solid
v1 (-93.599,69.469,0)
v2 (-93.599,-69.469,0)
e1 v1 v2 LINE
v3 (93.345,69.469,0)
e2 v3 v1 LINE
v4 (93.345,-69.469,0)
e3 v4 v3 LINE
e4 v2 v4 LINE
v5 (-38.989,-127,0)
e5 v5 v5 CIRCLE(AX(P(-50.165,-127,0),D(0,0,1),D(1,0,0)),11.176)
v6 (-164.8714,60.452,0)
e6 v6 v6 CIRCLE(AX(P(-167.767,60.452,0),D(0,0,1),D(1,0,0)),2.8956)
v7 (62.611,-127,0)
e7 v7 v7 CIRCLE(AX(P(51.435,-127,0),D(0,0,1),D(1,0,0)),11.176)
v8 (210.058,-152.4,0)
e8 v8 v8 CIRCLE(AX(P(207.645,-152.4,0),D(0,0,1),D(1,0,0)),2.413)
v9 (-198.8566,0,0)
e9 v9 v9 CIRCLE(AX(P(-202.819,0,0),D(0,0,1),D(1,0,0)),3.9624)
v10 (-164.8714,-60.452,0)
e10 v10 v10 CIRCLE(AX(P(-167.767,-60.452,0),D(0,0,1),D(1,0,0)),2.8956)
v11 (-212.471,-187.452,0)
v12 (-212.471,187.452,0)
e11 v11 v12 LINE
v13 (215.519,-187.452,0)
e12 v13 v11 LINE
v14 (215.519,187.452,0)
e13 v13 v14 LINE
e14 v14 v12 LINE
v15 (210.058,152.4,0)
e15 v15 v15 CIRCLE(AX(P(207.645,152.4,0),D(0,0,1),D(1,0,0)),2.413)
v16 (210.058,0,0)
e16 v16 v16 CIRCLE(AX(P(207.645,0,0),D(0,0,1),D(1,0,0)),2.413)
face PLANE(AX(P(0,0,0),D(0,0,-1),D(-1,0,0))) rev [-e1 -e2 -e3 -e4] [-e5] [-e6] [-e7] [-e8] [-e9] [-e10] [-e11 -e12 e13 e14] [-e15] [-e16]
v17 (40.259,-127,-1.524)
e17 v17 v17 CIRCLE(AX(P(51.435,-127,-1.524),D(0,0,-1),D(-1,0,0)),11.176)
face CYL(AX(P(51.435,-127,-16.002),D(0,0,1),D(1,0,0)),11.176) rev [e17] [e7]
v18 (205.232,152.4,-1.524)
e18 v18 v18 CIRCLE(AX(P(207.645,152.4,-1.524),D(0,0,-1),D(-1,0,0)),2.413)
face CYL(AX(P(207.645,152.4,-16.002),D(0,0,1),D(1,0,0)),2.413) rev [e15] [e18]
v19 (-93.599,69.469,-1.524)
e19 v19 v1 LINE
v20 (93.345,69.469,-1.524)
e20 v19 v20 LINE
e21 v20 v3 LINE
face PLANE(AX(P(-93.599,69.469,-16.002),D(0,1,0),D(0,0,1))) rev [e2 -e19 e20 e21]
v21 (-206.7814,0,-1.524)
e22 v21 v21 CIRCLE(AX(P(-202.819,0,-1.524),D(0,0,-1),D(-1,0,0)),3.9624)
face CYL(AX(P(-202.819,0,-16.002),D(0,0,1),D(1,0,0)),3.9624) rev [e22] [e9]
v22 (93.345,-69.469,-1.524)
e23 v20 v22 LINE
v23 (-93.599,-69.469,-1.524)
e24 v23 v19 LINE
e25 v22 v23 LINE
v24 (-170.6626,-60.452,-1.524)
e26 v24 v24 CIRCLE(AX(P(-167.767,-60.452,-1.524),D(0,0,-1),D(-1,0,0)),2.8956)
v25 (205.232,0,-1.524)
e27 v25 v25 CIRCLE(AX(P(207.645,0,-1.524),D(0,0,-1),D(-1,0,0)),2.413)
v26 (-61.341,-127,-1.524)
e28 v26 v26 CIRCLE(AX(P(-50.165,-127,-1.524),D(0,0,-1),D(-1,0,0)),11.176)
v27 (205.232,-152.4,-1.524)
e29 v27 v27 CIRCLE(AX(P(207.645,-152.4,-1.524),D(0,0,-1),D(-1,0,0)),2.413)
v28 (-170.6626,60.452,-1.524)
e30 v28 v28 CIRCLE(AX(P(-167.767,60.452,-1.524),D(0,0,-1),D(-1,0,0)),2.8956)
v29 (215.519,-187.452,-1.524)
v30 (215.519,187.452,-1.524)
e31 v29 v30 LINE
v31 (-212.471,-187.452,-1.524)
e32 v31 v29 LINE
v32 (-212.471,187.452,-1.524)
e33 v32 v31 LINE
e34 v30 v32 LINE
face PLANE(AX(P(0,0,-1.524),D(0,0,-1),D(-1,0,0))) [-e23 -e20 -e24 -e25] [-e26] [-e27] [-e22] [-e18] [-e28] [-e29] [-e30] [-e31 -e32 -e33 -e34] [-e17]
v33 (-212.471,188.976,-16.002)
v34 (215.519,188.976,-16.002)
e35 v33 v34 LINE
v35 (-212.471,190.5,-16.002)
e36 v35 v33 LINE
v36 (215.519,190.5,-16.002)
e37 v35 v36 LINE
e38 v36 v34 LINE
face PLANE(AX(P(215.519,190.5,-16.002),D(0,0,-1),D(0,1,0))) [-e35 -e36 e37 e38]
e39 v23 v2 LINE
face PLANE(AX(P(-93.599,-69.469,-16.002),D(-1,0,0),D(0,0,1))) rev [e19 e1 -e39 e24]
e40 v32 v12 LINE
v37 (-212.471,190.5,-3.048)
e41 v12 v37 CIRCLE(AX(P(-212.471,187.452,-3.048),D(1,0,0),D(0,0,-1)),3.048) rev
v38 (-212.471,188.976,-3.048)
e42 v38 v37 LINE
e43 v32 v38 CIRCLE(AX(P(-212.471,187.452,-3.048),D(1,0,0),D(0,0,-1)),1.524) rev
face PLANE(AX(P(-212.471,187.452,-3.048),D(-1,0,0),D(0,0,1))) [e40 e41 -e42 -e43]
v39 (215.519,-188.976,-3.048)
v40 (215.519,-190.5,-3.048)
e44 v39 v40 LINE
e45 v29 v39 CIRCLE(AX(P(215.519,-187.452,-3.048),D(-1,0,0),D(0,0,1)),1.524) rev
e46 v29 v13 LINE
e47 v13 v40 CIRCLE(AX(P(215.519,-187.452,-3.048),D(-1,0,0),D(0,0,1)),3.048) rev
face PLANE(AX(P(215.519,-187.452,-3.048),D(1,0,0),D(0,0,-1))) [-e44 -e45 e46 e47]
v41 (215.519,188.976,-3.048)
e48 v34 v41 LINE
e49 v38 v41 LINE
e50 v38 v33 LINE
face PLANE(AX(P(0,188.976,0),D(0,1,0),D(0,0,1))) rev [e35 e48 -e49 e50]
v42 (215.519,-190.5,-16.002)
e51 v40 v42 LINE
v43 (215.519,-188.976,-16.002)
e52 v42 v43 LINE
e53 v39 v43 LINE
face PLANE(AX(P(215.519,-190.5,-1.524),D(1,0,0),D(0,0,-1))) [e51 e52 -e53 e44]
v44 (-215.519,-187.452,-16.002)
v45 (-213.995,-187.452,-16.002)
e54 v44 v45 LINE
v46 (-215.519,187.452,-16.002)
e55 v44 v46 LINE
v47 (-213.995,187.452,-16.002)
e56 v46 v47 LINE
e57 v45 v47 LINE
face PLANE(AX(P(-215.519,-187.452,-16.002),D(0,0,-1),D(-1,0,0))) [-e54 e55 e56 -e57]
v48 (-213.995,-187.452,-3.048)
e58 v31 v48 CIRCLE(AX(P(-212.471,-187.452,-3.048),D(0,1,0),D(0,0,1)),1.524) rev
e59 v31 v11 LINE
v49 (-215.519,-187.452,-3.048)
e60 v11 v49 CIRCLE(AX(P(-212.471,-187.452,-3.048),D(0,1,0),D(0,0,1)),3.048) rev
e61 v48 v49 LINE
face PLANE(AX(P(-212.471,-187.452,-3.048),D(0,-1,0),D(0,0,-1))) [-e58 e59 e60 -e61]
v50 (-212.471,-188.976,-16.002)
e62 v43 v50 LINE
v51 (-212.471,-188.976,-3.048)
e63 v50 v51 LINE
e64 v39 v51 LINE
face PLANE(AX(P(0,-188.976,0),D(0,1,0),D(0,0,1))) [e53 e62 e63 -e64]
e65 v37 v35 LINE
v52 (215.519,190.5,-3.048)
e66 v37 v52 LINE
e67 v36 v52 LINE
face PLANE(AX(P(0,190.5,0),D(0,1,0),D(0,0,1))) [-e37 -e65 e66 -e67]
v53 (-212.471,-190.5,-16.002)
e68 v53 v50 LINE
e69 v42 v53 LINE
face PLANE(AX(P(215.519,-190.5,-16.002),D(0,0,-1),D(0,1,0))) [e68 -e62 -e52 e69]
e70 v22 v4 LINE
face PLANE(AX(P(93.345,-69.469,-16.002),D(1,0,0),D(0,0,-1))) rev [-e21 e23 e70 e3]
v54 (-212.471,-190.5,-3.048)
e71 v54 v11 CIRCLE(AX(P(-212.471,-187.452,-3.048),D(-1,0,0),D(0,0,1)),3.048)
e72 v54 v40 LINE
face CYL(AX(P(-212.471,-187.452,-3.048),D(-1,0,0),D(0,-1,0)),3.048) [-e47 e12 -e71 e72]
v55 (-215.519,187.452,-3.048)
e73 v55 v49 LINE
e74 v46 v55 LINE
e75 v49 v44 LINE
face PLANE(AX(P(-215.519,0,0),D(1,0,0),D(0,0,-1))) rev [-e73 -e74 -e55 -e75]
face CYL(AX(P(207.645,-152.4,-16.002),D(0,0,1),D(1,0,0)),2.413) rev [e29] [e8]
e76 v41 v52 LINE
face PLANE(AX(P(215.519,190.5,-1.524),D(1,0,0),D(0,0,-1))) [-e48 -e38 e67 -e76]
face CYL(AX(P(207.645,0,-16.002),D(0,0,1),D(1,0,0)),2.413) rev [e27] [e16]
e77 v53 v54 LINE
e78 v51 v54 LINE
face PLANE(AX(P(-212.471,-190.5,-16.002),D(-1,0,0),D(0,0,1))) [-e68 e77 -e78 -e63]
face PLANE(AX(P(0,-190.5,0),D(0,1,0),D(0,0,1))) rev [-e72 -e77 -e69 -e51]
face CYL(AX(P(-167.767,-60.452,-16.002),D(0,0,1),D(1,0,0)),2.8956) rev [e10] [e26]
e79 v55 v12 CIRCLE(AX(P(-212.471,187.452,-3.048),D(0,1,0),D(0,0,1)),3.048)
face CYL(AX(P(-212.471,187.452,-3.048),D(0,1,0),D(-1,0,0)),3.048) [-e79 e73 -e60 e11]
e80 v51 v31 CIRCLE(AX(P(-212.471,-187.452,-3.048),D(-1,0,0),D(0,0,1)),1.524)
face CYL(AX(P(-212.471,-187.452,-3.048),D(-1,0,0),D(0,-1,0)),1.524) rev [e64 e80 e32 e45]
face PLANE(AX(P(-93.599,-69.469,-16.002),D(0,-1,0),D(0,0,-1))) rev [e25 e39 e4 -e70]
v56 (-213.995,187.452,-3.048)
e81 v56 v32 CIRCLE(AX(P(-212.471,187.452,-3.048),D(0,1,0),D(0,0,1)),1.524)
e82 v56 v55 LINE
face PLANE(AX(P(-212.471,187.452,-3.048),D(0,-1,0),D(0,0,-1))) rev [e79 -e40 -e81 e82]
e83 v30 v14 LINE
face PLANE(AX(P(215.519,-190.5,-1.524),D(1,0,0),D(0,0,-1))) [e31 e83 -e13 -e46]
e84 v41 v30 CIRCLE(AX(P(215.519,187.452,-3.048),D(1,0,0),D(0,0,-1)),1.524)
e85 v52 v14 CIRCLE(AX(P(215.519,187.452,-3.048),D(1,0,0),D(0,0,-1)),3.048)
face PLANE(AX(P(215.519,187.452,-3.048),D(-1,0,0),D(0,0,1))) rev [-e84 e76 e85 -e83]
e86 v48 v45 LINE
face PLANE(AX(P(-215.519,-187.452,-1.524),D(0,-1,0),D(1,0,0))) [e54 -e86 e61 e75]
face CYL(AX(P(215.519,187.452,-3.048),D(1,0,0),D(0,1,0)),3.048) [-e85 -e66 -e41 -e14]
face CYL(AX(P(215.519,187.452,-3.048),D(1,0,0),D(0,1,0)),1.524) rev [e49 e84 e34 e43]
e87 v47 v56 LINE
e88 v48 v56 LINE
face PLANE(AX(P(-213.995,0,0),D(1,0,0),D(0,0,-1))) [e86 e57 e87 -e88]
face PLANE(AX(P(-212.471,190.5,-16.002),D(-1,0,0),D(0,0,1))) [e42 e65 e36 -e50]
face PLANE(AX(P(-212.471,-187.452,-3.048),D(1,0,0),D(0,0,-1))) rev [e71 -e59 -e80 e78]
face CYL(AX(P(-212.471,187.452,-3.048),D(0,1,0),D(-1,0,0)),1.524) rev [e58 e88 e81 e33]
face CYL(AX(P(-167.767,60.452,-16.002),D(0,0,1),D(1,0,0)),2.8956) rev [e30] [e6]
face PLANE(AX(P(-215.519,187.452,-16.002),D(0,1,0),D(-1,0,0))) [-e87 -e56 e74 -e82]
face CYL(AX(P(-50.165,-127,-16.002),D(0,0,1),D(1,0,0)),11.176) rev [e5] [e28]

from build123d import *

# Parameters (mm, degrees)
CROQUIS1_W                         = 431.038
CROQUIS1_H                         = 381
BRIDA_BASE1_DEPTH                  = 1.524
CROQUIS6_W                         = 3.048
CROQUIS6_H                         = 3.048
CORTAR_EXTRUIR1_DEPTH              = 288.647374292
BRIDA_DE_ARISTA1_STRIP_W           = 9.144
BRIDA_DE_ARISTA1_STRIP_H           = 1.524
BRIDA_DE_ARISTA1_STRIP_CUT_DEPTH   = 427.99
BRIDA_DE_ARISTA1_STRIP_2_W         = 9.144
BRIDA_DE_ARISTA1_STRIP_2_H         = 1.524
BRIDA_DE_ARISTA1_STRIP_CUT_2_DEPTH = 374.904
BRIDA_DE_ARISTA1_STRIP_3_W         = 9.144
BRIDA_DE_ARISTA1_STRIP_3_H         = 1.524
BRIDA_DE_ARISTA1_STRIP_CUT_3_DEPTH = 427.99
BRIDA_DE_ARISTA1_DEPTH             = 427.99
BRIDA_DE_ARISTA1_BEND_DEPTH        = 374.904
BRIDA_DE_ARISTA1_BEND_2_DEPTH      = 427.99
CROQUIS16_R                        = 3.9624
CROQUIS16_R_2                      = 2.8956
CROQUIS16_R_3                      = 11.176
CROQUIS16_R_4                      = 2.413
CROQUIS16_W                        = 186.944
CROQUIS16_H                        = 138.938
CORTAR_EXTRUIR2_DEPTH              = 289.088100006


# Sheet-metal steps are written as plain solids
with BuildPart() as part:
    # Croquis1 → Brida base1 (new body)
    with BuildSketch(Plane.XY):
        Rectangle(CROQUIS1_W, CROQUIS1_H)
    extrude(amount=-BRIDA_BASE1_DEPTH)

    # Croquis6 → Cortar-Extruir1 (cut, through all)
    with BuildSketch(Plane.XY):
        with Locations((-213.995, 188.976)):
            Rectangle(CROQUIS6_W, CROQUIS6_H)
        with Locations((-213.995, -188.976)):
            Rectangle(CROQUIS6_W, CROQUIS6_H)
    extrude(amount=-CORTAR_EXTRUIR1_DEPTH, mode=Mode.SUBTRACT)

    # Brida de arista1 strip (across the edge) → Brida de arista1 strip cut (cut)
    with BuildSketch(Plane(origin=(-212.471, 190.5, -1.524), x_dir=(0, -1, 0), z_dir=(1, 0, 0))):
        with Locations((-1.524, -0.762)):
            Rectangle(BRIDA_DE_ARISTA1_STRIP_W, BRIDA_DE_ARISTA1_STRIP_H)
    extrude(amount=BRIDA_DE_ARISTA1_STRIP_CUT_DEPTH, mode=Mode.SUBTRACT)

    # Brida de arista1 strip 2 (across the edge) → Brida de arista1 strip cut 2 (cut)
    with BuildSketch(Plane(origin=(-215.519, -187.452, -1.524), x_dir=(1, 0, 0), z_dir=(0, 1, 0))):
        with Locations((-1.524, -0.762)):
            Rectangle(BRIDA_DE_ARISTA1_STRIP_2_W, BRIDA_DE_ARISTA1_STRIP_2_H)
    extrude(amount=BRIDA_DE_ARISTA1_STRIP_CUT_2_DEPTH, mode=Mode.SUBTRACT)

    # Brida de arista1 strip 3 (across the edge) → Brida de arista1 strip cut 3 (cut)
    with BuildSketch(Plane(origin=(215.519, -190.5, -1.524), x_dir=(0, 1, 0), z_dir=(-1, 0, 0))):
        with Locations((-1.524, -0.762)):
            Rectangle(BRIDA_DE_ARISTA1_STRIP_3_W, BRIDA_DE_ARISTA1_STRIP_3_H)
    extrude(amount=BRIDA_DE_ARISTA1_STRIP_CUT_3_DEPTH, mode=Mode.SUBTRACT)

    # Brida de arista1 section (across the edge) → Brida de arista1 (add)
    with BuildSketch(Plane(origin=(-212.471, 190.5, -1.524), x_dir=(0, -1, 0), z_dir=(1, 0, 0))):
        with BuildLine():
            Line((0, 1.524), (0, 14.478))
            Line((0, 14.478), (1.524, 14.478))
            Line((1.524, 14.478), (1.524, 1.524))
            ThreePointArc((1.524, 1.524), (1.970369265, 0.446369265), (3.048, 0))
            Line((3.048, 0), (3.048, -1.524))
            ThreePointArc((3.048, -1.524), (0.892738531, -0.631261469), (0, 1.524))
        make_face()
    extrude(amount=BRIDA_DE_ARISTA1_DEPTH)

    # Brida de arista1 section 2 (across the edge) → Brida de arista1 bend (add)
    with BuildSketch(Plane(origin=(-215.519, -187.452, -1.524), x_dir=(1, 0, 0), z_dir=(0, 1, 0))):
        with BuildLine():
            Line((0, 1.524), (0, 14.478))
            Line((0, 14.478), (1.524, 14.478))
            Line((1.524, 14.478), (1.524, 1.524))
            ThreePointArc((1.524, 1.524), (1.970369265, 0.446369265), (3.048, 0))
            Line((3.048, 0), (3.048, -1.524))
            ThreePointArc((3.048, -1.524), (0.892738531, -0.631261469), (0, 1.524))
        make_face()
    extrude(amount=BRIDA_DE_ARISTA1_BEND_DEPTH)

    # Brida de arista1 section 3 (across the edge) → Brida de arista1 bend 2 (add)
    with BuildSketch(Plane(origin=(215.519, -190.5, -1.524), x_dir=(0, 1, 0), z_dir=(-1, 0, 0))):
        with BuildLine():
            Line((0, 1.524), (0, 14.478))
            Line((0, 14.478), (1.524, 14.478))
            Line((1.524, 14.478), (1.524, 1.524))
            ThreePointArc((1.524, 1.524), (1.970369265, 0.446369265), (3.048, 0))
            Line((3.048, 0), (3.048, -1.524))
            ThreePointArc((3.048, -1.524), (0.892738531, -0.631261469), (0, 1.524))
        make_face()
    extrude(amount=BRIDA_DE_ARISTA1_BEND_2_DEPTH)

    # Croquis16 → Cortar-Extruir2 (cut, through all)
    with BuildSketch(Plane.XY):
        with Locations((-202.819, 0)):
            Circle(CROQUIS16_R)
        with Locations((-167.767, 60.452)):
            Circle(CROQUIS16_R_2)
        with Locations((-167.767, -60.452)):
            Circle(CROQUIS16_R_2)
        with Locations((-50.165, -127)):
            Circle(CROQUIS16_R_3)
        with Locations((51.435, -127)):
            Circle(CROQUIS16_R_3)
        with Locations((207.645, 152.4)):
            Circle(CROQUIS16_R_4)
        with Locations((207.645, 0)):
            Circle(CROQUIS16_R_4)
        with Locations((207.645, -152.4)):
            Circle(CROQUIS16_R_4)
        with Locations((-0.127, 0)):
            Rectangle(CROQUIS16_W, CROQUIS16_H)
    extrude(amount=-CORTAR_EXTRUIR2_DEPTH, mode=Mode.SUBTRACT)


solid = part.part
